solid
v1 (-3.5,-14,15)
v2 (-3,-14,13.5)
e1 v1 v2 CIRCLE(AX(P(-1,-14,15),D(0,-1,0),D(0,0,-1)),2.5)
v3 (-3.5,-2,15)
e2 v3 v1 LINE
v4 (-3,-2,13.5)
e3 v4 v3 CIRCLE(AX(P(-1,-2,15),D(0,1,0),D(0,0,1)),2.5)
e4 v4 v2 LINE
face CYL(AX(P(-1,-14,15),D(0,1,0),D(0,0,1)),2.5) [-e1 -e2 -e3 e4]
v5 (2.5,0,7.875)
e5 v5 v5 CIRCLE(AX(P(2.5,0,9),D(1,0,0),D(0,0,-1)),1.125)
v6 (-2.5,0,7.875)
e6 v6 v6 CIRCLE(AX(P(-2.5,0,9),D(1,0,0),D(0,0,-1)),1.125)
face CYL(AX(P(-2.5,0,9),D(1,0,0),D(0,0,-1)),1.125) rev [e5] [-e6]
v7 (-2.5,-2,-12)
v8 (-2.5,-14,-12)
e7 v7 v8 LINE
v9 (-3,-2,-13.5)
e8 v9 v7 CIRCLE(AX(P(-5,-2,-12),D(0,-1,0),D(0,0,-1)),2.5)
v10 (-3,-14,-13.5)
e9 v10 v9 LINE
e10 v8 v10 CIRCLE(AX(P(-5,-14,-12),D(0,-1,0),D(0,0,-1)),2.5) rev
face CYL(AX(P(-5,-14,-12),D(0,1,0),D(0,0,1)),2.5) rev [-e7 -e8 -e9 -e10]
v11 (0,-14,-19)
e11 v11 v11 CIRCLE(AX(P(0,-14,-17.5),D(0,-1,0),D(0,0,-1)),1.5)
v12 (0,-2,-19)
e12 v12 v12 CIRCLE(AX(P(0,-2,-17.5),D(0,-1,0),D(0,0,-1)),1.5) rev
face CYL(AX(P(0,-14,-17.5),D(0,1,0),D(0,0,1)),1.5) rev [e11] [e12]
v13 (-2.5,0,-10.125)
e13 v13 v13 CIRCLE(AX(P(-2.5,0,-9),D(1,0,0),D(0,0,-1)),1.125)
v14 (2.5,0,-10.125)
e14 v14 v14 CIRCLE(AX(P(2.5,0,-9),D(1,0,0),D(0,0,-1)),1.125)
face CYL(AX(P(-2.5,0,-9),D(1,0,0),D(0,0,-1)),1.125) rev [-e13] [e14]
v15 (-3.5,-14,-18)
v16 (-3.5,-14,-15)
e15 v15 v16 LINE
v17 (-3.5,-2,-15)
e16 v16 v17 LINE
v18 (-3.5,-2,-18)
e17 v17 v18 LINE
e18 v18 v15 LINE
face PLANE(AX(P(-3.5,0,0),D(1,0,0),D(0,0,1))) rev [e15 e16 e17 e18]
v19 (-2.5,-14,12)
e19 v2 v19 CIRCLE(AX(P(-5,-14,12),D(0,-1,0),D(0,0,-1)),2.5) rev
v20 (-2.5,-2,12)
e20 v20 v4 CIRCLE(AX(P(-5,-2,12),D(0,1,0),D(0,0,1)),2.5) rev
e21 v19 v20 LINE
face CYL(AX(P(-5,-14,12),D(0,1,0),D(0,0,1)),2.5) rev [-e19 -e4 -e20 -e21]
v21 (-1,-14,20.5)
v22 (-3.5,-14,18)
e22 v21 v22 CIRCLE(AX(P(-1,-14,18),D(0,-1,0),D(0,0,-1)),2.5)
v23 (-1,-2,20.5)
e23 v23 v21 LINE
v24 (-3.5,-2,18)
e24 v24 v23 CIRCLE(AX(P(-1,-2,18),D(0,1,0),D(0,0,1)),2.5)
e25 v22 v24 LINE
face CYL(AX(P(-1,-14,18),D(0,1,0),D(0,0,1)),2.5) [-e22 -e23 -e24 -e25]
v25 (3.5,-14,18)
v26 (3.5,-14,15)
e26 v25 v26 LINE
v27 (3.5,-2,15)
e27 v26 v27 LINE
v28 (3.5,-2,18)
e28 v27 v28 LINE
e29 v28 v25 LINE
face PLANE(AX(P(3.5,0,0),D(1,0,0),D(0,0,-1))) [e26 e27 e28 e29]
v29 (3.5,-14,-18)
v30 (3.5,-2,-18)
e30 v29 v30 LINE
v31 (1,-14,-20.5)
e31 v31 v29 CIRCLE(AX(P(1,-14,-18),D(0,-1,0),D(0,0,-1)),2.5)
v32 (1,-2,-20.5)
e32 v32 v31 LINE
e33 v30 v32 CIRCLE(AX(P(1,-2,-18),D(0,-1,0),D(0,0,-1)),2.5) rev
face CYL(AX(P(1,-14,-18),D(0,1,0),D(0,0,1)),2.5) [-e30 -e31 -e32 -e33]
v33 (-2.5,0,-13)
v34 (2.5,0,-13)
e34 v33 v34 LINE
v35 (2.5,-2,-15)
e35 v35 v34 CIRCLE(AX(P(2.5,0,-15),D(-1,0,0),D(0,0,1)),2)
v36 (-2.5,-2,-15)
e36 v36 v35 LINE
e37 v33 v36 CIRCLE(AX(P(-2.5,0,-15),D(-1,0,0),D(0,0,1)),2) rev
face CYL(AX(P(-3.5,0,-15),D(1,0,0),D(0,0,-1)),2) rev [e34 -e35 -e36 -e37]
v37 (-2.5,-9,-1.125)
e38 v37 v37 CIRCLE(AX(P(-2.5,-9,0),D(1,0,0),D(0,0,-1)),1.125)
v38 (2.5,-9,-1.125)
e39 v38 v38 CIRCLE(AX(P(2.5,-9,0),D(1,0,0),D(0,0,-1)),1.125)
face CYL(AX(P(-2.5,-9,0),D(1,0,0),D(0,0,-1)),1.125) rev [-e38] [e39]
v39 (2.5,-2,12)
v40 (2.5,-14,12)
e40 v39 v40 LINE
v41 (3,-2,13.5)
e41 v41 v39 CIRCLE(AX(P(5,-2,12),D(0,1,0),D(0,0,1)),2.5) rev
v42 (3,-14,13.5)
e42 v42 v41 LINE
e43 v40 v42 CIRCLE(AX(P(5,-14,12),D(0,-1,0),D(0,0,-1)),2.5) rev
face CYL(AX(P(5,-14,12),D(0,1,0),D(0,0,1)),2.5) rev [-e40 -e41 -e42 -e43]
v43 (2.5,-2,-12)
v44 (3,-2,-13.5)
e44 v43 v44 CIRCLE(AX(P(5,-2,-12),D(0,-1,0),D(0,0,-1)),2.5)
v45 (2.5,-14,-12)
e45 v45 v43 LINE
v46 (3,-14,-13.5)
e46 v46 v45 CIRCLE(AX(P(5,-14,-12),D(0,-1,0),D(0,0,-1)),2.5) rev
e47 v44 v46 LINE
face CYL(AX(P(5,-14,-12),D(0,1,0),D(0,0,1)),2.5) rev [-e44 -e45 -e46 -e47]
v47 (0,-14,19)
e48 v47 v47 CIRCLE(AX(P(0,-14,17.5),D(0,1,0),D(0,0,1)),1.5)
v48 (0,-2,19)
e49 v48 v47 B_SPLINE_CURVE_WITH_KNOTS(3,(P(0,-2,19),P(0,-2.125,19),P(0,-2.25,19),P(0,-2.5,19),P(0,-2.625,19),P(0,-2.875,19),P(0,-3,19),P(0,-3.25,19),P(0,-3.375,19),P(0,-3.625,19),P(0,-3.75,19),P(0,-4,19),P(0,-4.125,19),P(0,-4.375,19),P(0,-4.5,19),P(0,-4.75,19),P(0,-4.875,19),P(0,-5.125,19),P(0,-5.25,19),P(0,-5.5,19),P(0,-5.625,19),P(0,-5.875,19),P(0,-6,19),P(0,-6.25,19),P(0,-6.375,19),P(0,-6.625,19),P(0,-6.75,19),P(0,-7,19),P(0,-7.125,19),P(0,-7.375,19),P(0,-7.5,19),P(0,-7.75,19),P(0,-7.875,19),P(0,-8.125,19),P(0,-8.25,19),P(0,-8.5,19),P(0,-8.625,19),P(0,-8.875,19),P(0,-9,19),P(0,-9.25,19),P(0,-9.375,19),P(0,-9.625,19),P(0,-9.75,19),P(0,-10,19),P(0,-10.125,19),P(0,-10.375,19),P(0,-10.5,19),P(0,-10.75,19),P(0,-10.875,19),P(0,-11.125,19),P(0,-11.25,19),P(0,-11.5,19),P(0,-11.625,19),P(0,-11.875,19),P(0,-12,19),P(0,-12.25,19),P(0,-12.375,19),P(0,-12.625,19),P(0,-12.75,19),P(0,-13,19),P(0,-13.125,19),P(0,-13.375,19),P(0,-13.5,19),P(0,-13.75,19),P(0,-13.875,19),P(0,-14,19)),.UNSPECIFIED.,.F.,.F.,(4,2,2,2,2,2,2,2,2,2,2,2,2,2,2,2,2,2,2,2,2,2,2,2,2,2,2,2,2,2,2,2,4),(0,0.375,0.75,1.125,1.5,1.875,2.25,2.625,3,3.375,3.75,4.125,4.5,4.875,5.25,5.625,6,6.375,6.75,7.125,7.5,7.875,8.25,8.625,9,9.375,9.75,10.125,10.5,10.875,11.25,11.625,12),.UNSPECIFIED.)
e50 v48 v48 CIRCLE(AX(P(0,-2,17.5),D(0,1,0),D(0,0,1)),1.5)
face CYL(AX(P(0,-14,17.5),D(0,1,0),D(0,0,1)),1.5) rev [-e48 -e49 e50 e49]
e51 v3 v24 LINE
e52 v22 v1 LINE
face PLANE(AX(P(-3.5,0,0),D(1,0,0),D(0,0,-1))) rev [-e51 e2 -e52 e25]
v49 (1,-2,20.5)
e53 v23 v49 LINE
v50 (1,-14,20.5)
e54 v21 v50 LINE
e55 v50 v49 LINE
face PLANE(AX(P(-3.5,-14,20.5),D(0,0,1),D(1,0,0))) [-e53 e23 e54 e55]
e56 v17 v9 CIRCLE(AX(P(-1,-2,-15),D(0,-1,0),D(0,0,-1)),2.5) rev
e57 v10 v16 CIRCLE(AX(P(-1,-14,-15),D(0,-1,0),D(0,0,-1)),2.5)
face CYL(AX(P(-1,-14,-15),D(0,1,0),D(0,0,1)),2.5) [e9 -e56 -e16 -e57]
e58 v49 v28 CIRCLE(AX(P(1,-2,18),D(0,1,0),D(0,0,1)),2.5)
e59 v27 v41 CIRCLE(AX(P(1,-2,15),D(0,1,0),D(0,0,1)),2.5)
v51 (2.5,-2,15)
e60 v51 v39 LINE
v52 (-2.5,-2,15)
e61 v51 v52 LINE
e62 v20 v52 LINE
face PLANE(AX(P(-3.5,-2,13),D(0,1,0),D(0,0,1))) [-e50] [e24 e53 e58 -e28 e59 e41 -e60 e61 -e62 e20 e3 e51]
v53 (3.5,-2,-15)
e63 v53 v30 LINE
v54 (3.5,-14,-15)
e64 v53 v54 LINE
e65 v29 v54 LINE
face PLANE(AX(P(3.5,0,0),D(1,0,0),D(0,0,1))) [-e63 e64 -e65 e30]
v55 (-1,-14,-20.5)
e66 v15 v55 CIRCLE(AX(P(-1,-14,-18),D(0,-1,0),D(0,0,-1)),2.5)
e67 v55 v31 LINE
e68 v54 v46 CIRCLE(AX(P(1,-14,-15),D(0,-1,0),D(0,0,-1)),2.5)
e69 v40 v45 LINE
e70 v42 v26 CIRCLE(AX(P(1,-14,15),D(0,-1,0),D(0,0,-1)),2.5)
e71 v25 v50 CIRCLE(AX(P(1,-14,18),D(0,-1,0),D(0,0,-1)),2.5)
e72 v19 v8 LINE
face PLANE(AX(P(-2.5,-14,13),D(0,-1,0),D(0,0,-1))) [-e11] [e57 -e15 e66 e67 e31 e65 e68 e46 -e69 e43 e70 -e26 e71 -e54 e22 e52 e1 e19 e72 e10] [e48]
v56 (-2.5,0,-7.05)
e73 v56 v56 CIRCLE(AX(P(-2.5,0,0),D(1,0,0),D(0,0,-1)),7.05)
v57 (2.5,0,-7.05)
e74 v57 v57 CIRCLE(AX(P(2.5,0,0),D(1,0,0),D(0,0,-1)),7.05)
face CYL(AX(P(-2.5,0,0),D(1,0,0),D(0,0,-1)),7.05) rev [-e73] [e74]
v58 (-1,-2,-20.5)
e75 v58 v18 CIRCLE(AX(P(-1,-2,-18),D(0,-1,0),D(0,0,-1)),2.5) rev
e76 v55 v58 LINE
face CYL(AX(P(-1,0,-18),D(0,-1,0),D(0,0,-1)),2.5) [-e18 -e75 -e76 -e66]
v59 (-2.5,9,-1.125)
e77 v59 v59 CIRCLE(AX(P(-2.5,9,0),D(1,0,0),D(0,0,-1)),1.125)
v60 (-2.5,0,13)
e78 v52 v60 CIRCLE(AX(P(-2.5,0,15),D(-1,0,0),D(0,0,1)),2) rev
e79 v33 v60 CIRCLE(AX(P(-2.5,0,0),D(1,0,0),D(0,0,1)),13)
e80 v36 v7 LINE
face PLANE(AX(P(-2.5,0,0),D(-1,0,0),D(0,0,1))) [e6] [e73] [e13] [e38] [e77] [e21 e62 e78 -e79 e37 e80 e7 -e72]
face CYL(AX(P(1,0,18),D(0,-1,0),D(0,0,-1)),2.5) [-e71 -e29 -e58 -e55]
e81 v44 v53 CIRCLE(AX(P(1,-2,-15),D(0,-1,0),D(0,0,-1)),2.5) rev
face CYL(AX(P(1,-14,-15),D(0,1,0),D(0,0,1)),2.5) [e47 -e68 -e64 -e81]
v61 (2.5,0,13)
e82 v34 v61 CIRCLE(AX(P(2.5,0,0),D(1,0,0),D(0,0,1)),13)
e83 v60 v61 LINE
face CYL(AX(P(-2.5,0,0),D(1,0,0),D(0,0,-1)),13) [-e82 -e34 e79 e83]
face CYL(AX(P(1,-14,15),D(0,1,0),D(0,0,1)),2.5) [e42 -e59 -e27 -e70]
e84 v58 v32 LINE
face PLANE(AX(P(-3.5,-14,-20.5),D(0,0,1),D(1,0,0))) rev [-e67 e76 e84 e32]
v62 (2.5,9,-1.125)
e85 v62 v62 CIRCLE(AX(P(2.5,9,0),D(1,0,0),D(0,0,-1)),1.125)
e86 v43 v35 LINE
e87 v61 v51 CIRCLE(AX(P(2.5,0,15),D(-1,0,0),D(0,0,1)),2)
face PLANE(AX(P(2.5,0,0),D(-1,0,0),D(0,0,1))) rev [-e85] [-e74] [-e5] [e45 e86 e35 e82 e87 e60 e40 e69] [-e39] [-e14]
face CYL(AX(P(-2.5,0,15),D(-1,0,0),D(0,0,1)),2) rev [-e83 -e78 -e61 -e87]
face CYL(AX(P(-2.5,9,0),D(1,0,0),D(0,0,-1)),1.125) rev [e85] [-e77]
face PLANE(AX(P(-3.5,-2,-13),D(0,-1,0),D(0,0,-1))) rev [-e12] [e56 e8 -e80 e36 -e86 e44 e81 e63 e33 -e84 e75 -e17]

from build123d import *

# Parameters (mm, degrees)
BOSS_EXTRUDE1_DEPTH      = 2.5
BOSS_EXTRUDE1_DEPTH_BACK = 2.5
SKETCH1_R                = 1.125
SKETCH1_R_2              = 7.05
SKETCH2_W                = 7.5
SKETCH2_H                = 12
BOSS_EXTRUDE2_DEPTH      = 3.5
FILLET3_R                = 2.5
FILLET4_R                = 2.5
FILLET5_R                = 2.5
SKETCH5_R                = 1.5
CUT_EXTRUDE1_DEPTH       = 26.64176281
FILLET3_OF_MIRROR1_R     = 2.5
FILLET4_OF_MIRROR1_R     = 2.5
FILLET5_OF_MIRROR1_R     = 2.5
FILLET6_R                = 2


# Some blends are built 0.0001 mm under size
with BuildPart() as part:
    # Sketch1 → Boss-Extrude1 (new, two sides: drawn at the far end of the back side and taken through both)
    with BuildSketch(Plane(origin=(0, 0, 0), x_dir=(0, 0, -1), z_dir=(1, 0, 0)).offset(-BOSS_EXTRUDE1_DEPTH_BACK)):
        with BuildLine():
            Line((-13, 0), (-13, -3))
            Line((-13, -3), (-13, -14))
            Line((-13, -14), (13, -14))
            Line((13, -14), (13, -3))
            Line((13, -3), (13, 0))
            ThreePointArc((13, 0), (0, 13), (-13, 0))
        make_face()
        with Locations((0, 9)):
            Circle(SKETCH1_R, mode=Mode.SUBTRACT)
        with Locations((9, 0)):
            Circle(SKETCH1_R, mode=Mode.SUBTRACT)
        with Locations((0, -9)):
            Circle(SKETCH1_R, mode=Mode.SUBTRACT)
        with Locations((-9, 0)):
            Circle(SKETCH1_R, mode=Mode.SUBTRACT)
        Circle(SKETCH1_R_2, mode=Mode.SUBTRACT)
    extrude(amount=BOSS_EXTRUDE1_DEPTH + BOSS_EXTRUDE1_DEPTH_BACK)

    # Sketch2 → Boss-Extrude2 (add, symmetric)
    with BuildSketch(Plane(origin=(0, 0, 0), x_dir=(0, 0, -1), z_dir=(1, 0, 0))):
        with Locations((-16.75, -8)):
            Rectangle(SKETCH2_W, SKETCH2_H)
    boss_extrude2 = extrude(amount=BOSS_EXTRUDE2_DEPTH, both=True)

    # Fillet3
    fillet3_edges = [part.edges().sort_by_distance(p)[0] for p in [
        (-3.5, -8, 20.5),
        (3.5, -8, 20.5),
    ]]
    fillet(fillet3_edges, radius=FILLET3_R)

    # Fillet4
    # the kernel refuses this fillet: 2.5 mm, written as the material it takes off along each edge
    with BuildSketch(Plane(origin=(-3.5, 3, 13), x_dir=(0, 0, 1), z_dir=(0, -1, 0))) as fillet4_piece_1:
        with BuildLine():
            CenterArc((2, -2.5), FILLET4_R, 90, 53.130102354)
            Line((0, -1), (-0.04, -0.97))
            ThreePointArc((-0.04, -0.97), (-0.05, -0.5), (-0.05, 0))
            Line((-0.05, 0), (0, 0.05))
            Line((0, 0.05), (2, 0.05))
            Line((2, 0.05), (2, 0))
        make_face()
    extrude(amount=22, mode=Mode.SUBTRACT)
    with BuildSketch(Plane(origin=(3.5, 3, 13), x_dir=(-1, 0, 0), z_dir=(0, -1, 0))) as fillet4_piece_2:
        with BuildLine():
            CenterArc((2.5, -2), FILLET4_R, 126.869897646, 53.130102354)
            Line((0, -2), (-0.05, -2))
            Line((-0.05, -2), (-0.05, 0))
            Line((-0.05, 0), (0, 0.05))
            ThreePointArc((0, 0.05), (0.5, 0.05), (0.97, 0.04))
            Line((0.97, 0.04), (1, 0))
        make_face()
    extrude(amount=22, mode=Mode.SUBTRACT)

    # Fillet5
    fillet5_edges = [part.edges().sort_by_distance(p)[0] for p in [
        (2.5, -8, 13),
        (-2.5, -8, 13),
    ]]
    fillet(fillet5_edges, radius=FILLET5_R)

    # Sketch5 → Cut-Extrude1 (cut, symmetric)
    with BuildSketch(Plane(origin=(0, -2, 0), x_dir=(1, 0, 0), z_dir=(0, 1, 0))):
        with Locations(Location((0, -17.5, 0), (0, 0, 270))):
            Circle(SKETCH5_R)
    cut_extrude1 = extrude(amount=CUT_EXTRUDE1_DEPTH, both=True, mode=Mode.SUBTRACT)

    # Mirror1: Boss-Extrude2, Cut-Extrude1 across plane
    add(boss_extrude2.mirror(Plane.XY))
    add(cut_extrude1.mirror(Plane.XY), mode=Mode.SUBTRACT)

    # Fillet3 of Mirror1
    fillet3_of_mirror1_edges = [part.edges().sort_by_distance(p)[0] for p in [
        (-3.5, -8, -20.5),
        (3.5, -8, -20.5),
    ]]
    fillet(fillet3_of_mirror1_edges, radius=FILLET3_OF_MIRROR1_R)

    # Fillet4 of Mirror1
    # the kernel refuses this fillet: 2.5 mm, written as the material it takes off along each edge
    with BuildSketch(Plane(origin=(-3.5, 3, -13), x_dir=(0, 0, -1), z_dir=(0, -1, 0))) as fillet4_of_mirror1_piece_1:
        with BuildLine():
            CenterArc((2, 2.5), FILLET4_OF_MIRROR1_R, 216.869897646, 53.130102354)
            Line((0, 1), (-0.04, 0.97))
            ThreePointArc((-0.04, 0.97), (-0.05, 0.5), (-0.05, 0))
            Line((-0.05, 0), (0, -0.05))
            Line((0, -0.05), (2, -0.05))
            Line((2, -0.05), (2, 0))
        make_face()
    extrude(amount=22, mode=Mode.SUBTRACT)
    with BuildSketch(Plane(origin=(3.5, 3, -13), x_dir=(0, 0, -1), z_dir=(0, -1, 0))) as fillet4_of_mirror1_piece_2:
        with BuildLine():
            CenterArc((2, -2.5), FILLET4_OF_MIRROR1_R, 90, 53.130102354)
            Line((0, -1), (-0.04, -0.97))
            ThreePointArc((-0.04, -0.97), (-0.05, -0.5), (-0.05, 0))
            Line((-0.05, 0), (0, 0.05))
            Line((0, 0.05), (2, 0.05))
            Line((2, 0.05), (2, 0))
        make_face()
    extrude(amount=22, mode=Mode.SUBTRACT)

    # Fillet5 of Mirror1
    fillet5_of_mirror1_edges = [part.edges().sort_by_distance(p)[0] for p in [
        (2.5, -8, -13),
        (-2.5, -8, -13),
    ]]
    fillet(fillet5_of_mirror1_edges, radius=FILLET5_OF_MIRROR1_R)

    # Fillet6
    fillet6_edges = [part.edges().sort_by_distance(p)[0] for p in [
        (0, -2, 13),
        (0, -2, -13),
    ]]
    fillet(fillet6_edges, radius=FILLET6_R - 0.0001)  # a hair under: the kernel refuses the full size


solid = part.part
